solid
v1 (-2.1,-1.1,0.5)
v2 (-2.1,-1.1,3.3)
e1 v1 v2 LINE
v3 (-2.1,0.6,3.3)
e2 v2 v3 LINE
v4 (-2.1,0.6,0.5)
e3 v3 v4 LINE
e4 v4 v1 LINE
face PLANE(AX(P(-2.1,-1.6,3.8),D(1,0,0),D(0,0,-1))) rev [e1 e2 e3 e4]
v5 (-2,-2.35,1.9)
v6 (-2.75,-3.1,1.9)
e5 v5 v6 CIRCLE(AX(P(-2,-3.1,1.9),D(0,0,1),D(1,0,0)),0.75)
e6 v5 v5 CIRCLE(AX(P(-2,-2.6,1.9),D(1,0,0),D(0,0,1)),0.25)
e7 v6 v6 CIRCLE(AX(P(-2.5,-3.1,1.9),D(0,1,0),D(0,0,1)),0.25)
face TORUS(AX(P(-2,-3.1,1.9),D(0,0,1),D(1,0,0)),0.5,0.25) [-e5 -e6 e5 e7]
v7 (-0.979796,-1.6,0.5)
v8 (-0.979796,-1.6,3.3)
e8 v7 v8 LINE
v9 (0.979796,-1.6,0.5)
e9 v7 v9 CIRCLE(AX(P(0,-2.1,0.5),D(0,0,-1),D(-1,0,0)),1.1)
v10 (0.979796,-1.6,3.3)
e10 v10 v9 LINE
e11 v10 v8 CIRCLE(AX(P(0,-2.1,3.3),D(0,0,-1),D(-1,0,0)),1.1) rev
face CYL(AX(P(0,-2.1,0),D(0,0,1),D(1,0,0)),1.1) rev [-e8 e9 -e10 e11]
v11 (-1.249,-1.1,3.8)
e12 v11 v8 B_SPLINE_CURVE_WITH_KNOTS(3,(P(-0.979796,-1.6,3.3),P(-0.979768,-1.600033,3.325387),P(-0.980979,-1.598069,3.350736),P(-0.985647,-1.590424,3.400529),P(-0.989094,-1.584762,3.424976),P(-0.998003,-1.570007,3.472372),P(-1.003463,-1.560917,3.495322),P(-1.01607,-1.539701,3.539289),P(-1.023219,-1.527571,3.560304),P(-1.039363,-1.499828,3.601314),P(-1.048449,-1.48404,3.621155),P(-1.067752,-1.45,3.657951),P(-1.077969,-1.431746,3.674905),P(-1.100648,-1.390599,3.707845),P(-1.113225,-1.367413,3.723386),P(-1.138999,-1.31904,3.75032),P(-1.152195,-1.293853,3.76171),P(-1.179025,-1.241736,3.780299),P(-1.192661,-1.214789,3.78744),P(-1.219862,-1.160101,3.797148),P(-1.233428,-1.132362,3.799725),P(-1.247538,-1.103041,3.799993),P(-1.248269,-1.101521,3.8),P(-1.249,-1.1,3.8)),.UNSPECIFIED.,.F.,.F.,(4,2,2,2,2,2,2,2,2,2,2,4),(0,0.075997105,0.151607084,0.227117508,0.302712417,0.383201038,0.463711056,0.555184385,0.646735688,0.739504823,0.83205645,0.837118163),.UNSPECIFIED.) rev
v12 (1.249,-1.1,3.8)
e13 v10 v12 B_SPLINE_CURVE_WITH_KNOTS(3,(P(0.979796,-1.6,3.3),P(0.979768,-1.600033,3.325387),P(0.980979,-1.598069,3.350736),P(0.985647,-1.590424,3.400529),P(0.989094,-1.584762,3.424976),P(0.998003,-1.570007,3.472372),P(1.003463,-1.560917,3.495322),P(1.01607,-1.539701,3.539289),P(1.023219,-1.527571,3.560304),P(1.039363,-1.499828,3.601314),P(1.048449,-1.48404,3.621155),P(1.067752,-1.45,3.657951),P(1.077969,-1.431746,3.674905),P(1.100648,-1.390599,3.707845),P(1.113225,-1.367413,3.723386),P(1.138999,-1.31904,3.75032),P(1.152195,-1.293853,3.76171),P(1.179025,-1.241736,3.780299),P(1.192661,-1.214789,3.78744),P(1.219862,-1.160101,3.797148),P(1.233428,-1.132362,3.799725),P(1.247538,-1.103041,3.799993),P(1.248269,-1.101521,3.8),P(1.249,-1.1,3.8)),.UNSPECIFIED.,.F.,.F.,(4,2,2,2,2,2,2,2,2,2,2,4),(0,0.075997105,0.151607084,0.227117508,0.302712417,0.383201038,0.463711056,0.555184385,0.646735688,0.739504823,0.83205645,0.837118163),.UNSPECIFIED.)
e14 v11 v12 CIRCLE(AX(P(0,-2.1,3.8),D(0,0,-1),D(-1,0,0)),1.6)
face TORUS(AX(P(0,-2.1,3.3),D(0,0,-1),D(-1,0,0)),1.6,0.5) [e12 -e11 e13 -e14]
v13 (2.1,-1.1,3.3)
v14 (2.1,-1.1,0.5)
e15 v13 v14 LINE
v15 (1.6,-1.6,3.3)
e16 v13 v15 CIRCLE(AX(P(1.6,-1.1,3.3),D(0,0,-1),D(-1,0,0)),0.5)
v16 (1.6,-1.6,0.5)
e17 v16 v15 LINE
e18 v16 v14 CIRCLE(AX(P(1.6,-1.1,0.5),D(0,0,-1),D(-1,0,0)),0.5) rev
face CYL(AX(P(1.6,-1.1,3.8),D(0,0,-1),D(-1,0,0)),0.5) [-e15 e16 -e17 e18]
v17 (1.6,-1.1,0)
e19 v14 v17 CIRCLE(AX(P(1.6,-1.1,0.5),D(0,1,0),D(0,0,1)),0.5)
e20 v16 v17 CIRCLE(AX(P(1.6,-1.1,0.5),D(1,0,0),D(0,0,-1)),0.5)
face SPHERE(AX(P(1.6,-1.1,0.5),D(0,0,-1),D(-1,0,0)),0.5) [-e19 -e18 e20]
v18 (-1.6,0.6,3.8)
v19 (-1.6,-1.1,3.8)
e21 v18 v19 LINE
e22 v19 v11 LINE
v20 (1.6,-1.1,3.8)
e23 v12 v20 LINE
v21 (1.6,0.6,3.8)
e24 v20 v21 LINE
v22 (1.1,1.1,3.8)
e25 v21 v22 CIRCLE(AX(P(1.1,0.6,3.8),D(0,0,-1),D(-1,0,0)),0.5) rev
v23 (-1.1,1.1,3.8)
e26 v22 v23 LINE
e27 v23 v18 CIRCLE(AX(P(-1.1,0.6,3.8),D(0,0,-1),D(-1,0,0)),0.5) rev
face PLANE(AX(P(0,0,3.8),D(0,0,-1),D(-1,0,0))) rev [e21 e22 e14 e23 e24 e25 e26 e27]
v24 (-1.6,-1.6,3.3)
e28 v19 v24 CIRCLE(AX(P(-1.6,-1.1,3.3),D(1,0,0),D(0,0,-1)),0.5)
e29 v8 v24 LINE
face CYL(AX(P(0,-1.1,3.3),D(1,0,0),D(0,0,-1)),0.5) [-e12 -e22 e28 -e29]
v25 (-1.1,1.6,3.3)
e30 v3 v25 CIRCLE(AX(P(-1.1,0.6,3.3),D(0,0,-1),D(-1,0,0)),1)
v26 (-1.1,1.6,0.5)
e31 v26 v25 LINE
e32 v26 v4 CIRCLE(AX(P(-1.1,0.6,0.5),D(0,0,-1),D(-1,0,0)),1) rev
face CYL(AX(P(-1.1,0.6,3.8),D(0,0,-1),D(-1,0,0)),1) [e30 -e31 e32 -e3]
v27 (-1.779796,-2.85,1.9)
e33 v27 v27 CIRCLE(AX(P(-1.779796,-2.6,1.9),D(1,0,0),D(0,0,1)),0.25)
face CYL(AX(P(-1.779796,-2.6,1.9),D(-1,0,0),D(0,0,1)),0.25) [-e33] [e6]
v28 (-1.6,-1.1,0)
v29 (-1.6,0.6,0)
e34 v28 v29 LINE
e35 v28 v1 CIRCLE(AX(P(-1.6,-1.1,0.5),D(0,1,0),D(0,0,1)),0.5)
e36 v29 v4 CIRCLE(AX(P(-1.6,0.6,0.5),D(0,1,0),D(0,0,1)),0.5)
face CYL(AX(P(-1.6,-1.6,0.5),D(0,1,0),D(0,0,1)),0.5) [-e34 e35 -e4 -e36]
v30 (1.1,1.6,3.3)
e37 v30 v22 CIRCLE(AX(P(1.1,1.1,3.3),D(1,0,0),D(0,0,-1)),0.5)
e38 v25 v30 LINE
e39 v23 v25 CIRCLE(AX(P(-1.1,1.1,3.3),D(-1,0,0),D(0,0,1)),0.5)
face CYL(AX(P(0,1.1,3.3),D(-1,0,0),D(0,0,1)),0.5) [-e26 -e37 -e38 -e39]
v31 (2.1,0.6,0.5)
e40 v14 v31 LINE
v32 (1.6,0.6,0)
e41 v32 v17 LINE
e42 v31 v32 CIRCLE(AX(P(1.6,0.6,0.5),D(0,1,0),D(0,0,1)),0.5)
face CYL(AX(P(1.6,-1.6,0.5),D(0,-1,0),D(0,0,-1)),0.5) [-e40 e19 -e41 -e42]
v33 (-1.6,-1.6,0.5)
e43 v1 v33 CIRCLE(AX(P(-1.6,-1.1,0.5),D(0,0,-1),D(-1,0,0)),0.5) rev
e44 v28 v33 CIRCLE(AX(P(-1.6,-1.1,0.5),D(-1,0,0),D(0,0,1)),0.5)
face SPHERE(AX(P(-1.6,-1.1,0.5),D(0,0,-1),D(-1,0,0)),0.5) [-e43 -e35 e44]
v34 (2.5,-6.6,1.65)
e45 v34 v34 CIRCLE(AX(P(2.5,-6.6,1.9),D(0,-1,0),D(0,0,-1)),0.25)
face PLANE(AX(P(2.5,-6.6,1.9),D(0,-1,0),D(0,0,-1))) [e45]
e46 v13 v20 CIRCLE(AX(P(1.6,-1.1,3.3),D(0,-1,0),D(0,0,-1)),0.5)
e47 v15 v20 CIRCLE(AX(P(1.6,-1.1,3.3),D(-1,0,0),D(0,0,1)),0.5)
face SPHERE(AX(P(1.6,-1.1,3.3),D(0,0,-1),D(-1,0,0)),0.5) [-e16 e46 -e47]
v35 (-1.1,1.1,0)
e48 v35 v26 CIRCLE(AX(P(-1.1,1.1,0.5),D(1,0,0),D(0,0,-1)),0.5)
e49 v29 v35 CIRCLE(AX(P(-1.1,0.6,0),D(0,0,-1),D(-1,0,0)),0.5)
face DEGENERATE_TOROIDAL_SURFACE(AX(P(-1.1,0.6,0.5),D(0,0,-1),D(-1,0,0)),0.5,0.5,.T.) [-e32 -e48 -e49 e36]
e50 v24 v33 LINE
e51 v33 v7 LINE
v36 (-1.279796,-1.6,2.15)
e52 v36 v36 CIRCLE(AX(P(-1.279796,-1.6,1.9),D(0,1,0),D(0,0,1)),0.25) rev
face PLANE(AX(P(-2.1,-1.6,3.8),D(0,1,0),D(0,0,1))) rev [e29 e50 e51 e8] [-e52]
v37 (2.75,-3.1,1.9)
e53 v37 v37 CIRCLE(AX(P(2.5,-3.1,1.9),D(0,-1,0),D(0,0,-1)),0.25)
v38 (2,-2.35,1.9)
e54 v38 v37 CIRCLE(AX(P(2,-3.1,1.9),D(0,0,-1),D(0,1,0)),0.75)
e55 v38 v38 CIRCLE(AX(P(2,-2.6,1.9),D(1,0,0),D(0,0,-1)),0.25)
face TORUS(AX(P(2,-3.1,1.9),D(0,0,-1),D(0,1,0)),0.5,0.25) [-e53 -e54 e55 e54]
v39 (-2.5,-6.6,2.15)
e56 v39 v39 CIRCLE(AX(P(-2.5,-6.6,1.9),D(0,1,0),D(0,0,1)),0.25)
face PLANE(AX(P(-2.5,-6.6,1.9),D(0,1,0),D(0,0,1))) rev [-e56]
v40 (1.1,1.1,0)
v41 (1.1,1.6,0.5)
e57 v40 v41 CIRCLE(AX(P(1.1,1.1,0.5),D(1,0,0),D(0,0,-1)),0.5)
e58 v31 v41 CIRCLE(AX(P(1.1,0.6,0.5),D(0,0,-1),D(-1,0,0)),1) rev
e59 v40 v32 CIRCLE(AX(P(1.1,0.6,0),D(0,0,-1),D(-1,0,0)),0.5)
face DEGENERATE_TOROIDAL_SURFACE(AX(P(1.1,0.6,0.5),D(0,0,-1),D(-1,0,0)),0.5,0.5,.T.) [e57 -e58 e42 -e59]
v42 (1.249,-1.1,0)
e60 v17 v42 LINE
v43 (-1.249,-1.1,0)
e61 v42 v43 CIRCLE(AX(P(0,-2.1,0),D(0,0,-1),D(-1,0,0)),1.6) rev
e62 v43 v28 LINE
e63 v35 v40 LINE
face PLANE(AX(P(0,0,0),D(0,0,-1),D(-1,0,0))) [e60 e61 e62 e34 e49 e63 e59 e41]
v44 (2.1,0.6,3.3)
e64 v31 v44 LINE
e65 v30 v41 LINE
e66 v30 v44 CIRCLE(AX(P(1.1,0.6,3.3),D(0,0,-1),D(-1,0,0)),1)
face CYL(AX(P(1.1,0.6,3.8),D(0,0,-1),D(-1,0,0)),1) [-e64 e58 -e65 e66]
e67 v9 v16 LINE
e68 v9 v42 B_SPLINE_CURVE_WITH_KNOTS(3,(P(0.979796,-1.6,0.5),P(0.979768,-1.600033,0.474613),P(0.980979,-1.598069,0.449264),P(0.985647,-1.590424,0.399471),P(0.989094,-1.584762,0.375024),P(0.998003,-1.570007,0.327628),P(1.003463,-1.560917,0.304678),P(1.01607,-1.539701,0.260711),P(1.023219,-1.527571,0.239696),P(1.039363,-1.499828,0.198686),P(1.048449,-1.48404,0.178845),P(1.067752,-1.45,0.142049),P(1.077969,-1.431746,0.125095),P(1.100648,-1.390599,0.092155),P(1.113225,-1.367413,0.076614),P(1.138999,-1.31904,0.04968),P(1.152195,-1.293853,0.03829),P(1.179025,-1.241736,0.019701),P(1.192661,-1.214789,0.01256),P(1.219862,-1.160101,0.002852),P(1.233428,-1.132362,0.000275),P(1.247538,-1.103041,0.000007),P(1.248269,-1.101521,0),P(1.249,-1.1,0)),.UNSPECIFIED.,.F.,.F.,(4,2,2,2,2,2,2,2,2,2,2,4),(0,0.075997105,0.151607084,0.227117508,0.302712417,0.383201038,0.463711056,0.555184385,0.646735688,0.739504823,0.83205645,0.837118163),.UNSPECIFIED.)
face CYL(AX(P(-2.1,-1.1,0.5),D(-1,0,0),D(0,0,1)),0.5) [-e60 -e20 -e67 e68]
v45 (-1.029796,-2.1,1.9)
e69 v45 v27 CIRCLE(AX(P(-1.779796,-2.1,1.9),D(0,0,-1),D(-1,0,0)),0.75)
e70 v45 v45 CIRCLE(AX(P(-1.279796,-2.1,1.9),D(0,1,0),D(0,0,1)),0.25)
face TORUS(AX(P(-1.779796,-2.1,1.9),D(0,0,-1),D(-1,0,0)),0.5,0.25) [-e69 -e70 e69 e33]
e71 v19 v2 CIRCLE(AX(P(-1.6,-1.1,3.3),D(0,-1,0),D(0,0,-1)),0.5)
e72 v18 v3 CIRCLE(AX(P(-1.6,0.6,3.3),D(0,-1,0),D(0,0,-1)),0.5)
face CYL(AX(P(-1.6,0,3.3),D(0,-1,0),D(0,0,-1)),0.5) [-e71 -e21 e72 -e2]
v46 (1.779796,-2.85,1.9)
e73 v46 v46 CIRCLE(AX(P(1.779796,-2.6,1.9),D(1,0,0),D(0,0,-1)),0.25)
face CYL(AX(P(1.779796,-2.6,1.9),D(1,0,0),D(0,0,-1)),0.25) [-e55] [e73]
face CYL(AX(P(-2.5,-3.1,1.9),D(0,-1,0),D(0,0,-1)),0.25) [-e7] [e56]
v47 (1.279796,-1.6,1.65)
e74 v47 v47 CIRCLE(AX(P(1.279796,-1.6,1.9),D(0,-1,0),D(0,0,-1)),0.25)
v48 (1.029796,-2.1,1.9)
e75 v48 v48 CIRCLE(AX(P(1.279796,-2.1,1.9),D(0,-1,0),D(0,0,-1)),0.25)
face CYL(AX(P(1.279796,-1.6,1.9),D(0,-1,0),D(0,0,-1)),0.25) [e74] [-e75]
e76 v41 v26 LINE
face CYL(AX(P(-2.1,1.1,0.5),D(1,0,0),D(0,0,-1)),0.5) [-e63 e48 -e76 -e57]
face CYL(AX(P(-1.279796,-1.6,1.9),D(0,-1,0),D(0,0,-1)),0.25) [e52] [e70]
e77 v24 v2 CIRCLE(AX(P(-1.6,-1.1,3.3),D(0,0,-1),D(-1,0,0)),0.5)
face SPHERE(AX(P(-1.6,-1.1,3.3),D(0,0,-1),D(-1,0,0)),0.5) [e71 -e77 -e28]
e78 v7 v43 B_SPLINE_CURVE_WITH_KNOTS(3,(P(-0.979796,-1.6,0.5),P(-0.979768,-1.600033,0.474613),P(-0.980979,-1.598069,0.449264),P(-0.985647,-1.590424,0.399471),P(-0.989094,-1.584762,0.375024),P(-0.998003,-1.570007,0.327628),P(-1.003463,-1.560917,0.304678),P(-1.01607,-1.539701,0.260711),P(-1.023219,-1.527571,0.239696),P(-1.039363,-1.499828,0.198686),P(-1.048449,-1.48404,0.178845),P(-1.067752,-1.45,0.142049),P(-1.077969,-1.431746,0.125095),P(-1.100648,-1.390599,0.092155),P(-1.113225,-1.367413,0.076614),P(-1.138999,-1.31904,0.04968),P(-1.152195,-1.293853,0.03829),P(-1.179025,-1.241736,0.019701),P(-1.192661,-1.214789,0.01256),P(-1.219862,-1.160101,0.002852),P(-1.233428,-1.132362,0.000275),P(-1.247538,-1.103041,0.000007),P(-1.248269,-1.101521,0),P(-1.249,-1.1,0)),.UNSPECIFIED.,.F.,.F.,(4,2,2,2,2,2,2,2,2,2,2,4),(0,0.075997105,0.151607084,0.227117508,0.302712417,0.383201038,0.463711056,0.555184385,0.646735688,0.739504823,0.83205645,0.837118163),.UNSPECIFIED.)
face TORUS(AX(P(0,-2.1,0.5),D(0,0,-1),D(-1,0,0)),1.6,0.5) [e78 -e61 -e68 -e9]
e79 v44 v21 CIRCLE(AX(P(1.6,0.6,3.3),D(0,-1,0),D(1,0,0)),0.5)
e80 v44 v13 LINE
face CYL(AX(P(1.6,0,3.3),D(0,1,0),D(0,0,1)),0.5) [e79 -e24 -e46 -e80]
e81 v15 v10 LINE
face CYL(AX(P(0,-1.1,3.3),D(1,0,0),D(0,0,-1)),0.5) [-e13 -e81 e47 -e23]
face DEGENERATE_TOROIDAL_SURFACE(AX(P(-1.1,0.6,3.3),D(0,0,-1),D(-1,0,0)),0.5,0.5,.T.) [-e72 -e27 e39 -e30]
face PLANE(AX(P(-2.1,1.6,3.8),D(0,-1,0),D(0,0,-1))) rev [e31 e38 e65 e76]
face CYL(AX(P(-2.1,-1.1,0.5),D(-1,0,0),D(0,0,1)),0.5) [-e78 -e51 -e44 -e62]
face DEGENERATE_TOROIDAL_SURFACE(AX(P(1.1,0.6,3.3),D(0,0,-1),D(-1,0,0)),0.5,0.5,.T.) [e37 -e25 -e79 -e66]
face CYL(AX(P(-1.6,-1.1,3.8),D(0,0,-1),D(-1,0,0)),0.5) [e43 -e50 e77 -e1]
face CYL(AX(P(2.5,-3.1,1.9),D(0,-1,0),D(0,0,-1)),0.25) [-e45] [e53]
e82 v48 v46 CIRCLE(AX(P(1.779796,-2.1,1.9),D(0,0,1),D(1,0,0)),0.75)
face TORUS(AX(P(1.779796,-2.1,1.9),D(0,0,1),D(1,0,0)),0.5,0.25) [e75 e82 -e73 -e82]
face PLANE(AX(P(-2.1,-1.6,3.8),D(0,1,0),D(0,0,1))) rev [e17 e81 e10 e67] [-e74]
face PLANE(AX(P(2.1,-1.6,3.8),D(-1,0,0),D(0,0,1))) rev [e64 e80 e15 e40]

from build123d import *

# Parameters (mm, degrees)
SKETCH_1_W               = 4.2
SKETCH_1_H               = 3.2
EXTRUDE_1_DEPTH          = 3.8
CUT_EXTRUDE_1_DEPTH      = 5.627094121
CUT_EXTRUDE_1_DEPTH_BACK = 5.627094121
SKETCH_2_R               = 1.1
FILLET_1_R               = 1
FILLET_2_R               = 0.5
FILLET_3_R               = 0.5
SWEEP_1_PROFILE_R        = 0.25
SWEEP_2_OUTLINE_R        = 0.25
SWEEP_2_ANGLE            = 90
SWEEP_2_2_OUTLINE_R      = 0.25
SWEEP_2_2_ANGLE          = 90
SWEEP_START              = 1.779795797
SWEEP_2_3_OUTLINE_R      = 0.25
SWEEP_2_3_DEPTH          = 0.220204303
SWEEP_START_2            = -2.1000001
SWEEP_2_4_OUTLINE_R      = 0.25
SWEEP_2_4_DEPTH          = 1.1000001
SWEEP_START_3            = -6.6
SWEEP_2_5_OUTLINE_R      = 0.25
SWEEP_2_5_DEPTH          = 3.5000001


with BuildPart() as part:
    # Эскиз1 → Бобышка-Вытянуть1 (new body)
    with BuildSketch(Plane.XY):
        Rectangle(SKETCH_1_W, SKETCH_1_H)
    extrude(amount=EXTRUDE_1_DEPTH)

    # Эскиз2 → Вырез-Вытянуть1 (cut, two sides: drawn at the far end of the back side and taken through both)
    with BuildSketch(Plane.XY.offset(3.8).offset(-CUT_EXTRUDE_1_DEPTH_BACK)):
        with Locations((0, -2.1)):
            Circle(SKETCH_2_R)
    extrude(amount=CUT_EXTRUDE_1_DEPTH + CUT_EXTRUDE_1_DEPTH_BACK, mode=Mode.SUBTRACT)

    # Скругление1
    fillet_1_edges = [part.edges().sort_by_distance(p)[0] for p in [
        (-2.1, 1.6, 1.9),
        (2.1, 1.6, 1.9),
    ]]
    fillet(fillet_1_edges, radius=FILLET_1_R)

    # Скругление2
    fillet_2_edges = [part.edges().sort_by_distance(p)[0] for p in [
        (2.1, -1.6, 1.9),
        (-2.1, -1.6, 1.9),
    ]]
    fillet(fillet_2_edges, radius=FILLET_2_R)

    # Скругление3
    fillet_3_edges = [part.edges().sort_by_distance(p)[0] for p in [
        (1.289897949, -1.6, 0),
        (1.289897949, -1.6, 3.8),
        (0, -1, 0),
        (0, -1, 3.8),
        (0, 1.6, 0),
        (0, 1.6, 3.8),
        (-2.1, -0.25, 0),
        (-1.807106781, 1.307106781, 0),
        (1.807106781, 1.307106781, 0),
        (-2.1, -0.25, 3.8),
        (-1.807106781, 1.307106781, 3.8),
        (1.807106781, 1.307106781, 3.8),
        (2.1, -0.25, 0),
        (2.1, -0.25, 3.8),
        (-1.289897949, -1.6, 0),
        (-1.953553391, -1.453553391, 0),
        (1.953553391, -1.453553391, 0),
        (-1.289897949, -1.6, 3.8),
        (-1.953553391, -1.453553391, 3.8),
        (1.953553391, -1.453553391, 3.8),
    ]]
    fillet(fillet_3_edges, radius=FILLET_3_R)

    # По траектории1: sweep along a curve in space
    with BuildLine() as sweep_1_path:
        Line((-1.279795897, -1.6, 1.9), (-1.279795897, -2.1, 1.9))
        ThreePointArc((-1.279795897, -2.1, 1.9), (-1.426242507, -2.453553391, 1.9), (-1.779795897, -2.6, 1.9))
        Line((-1.779795897, -2.6, 1.9), (-2, -2.6, 1.9))
        ThreePointArc((-2.5, -3.1, 1.9), (-2.353553391, -2.746446609, 1.9), (-2, -2.6, 1.9))
        Line((-2.5, -3.1, 1.9), (-2.5, -6.6, 1.9))
    # По траектории1 profile (on start of the path) → По траектории1 (sweep)
    with BuildSketch(Plane(origin=(-1.279795897, -1.6, 1.9), x_dir=(0, 0, -1), z_dir=(0, -1, 0))):
        Circle(SWEEP_1_PROFILE_R)
    sweep(path=sweep_1_path.line)



with BuildPart() as body_2:
    # По траектории2: read off the stored shape, not the designer's step
    # По траектории2 outline → По траектории2 (revolve)
    with BuildSketch(Plane(origin=(1.779795897, -2.1, 0), x_dir=(-1, 0, 0), z_dir=(0, 1, 0))):
        with Locations((0.5, 1.9)):
            Circle(SWEEP_2_OUTLINE_R)
    revolve(axis=Axis((1.779795897, -2.1, 0), (0, 0, 1)), revolution_arc=SWEEP_2_ANGLE)



with BuildPart() as body_3:
    # Sweep 2 2 outline → Sweep 2 2 (revolve)
    with BuildSketch(Plane(origin=(2, -3.1, 0), x_dir=(1, 0, 0), z_dir=(0, -1, 0))):
        with Locations((0.5, 1.9)):
            Circle(SWEEP_2_2_OUTLINE_R)
    revolve(axis=Axis((2, -3.1, 0), (0, 0, 1)), revolution_arc=SWEEP_2_2_ANGLE)


with BuildPart() as body_2_1:
    add(body_2.part)

    add(body_3.part)  # Sweep 2 3 merges body 3
    # Sweep 2 3 outline → Sweep 2 3 (add)
    with BuildSketch(Plane.YZ.offset(SWEEP_START)):
        with Locations((-2.6, 1.9)):
            Circle(SWEEP_2_3_OUTLINE_R)
    extrude(amount=SWEEP_2_3_DEPTH)


with BuildPart() as part_1:
    add(part.part)

    add(body_2_1.part)  # Sweep 2 4 merges body 2
    # Sweep 2 4 outline → Sweep 2 4 (add)
    with BuildSketch(Plane(origin=(0, 0, 0), x_dir=(1, 0, 0), z_dir=(0, 1, 0)).offset(SWEEP_START_2)):
        with Locations((1.279795897, -1.9)):
            Circle(SWEEP_2_4_OUTLINE_R)
    extrude(amount=SWEEP_2_4_DEPTH)

    # Sweep 2 5 outline → Sweep 2 5 (add)
    with BuildSketch(Plane(origin=(0, 0, 0), x_dir=(1, 0, 0), z_dir=(0, 1, 0)).offset(SWEEP_START_3)):
        with Locations((2.5, -1.9)):
            Circle(SWEEP_2_5_OUTLINE_R)
    extrude(amount=SWEEP_2_5_DEPTH)


solid = part_1.part
